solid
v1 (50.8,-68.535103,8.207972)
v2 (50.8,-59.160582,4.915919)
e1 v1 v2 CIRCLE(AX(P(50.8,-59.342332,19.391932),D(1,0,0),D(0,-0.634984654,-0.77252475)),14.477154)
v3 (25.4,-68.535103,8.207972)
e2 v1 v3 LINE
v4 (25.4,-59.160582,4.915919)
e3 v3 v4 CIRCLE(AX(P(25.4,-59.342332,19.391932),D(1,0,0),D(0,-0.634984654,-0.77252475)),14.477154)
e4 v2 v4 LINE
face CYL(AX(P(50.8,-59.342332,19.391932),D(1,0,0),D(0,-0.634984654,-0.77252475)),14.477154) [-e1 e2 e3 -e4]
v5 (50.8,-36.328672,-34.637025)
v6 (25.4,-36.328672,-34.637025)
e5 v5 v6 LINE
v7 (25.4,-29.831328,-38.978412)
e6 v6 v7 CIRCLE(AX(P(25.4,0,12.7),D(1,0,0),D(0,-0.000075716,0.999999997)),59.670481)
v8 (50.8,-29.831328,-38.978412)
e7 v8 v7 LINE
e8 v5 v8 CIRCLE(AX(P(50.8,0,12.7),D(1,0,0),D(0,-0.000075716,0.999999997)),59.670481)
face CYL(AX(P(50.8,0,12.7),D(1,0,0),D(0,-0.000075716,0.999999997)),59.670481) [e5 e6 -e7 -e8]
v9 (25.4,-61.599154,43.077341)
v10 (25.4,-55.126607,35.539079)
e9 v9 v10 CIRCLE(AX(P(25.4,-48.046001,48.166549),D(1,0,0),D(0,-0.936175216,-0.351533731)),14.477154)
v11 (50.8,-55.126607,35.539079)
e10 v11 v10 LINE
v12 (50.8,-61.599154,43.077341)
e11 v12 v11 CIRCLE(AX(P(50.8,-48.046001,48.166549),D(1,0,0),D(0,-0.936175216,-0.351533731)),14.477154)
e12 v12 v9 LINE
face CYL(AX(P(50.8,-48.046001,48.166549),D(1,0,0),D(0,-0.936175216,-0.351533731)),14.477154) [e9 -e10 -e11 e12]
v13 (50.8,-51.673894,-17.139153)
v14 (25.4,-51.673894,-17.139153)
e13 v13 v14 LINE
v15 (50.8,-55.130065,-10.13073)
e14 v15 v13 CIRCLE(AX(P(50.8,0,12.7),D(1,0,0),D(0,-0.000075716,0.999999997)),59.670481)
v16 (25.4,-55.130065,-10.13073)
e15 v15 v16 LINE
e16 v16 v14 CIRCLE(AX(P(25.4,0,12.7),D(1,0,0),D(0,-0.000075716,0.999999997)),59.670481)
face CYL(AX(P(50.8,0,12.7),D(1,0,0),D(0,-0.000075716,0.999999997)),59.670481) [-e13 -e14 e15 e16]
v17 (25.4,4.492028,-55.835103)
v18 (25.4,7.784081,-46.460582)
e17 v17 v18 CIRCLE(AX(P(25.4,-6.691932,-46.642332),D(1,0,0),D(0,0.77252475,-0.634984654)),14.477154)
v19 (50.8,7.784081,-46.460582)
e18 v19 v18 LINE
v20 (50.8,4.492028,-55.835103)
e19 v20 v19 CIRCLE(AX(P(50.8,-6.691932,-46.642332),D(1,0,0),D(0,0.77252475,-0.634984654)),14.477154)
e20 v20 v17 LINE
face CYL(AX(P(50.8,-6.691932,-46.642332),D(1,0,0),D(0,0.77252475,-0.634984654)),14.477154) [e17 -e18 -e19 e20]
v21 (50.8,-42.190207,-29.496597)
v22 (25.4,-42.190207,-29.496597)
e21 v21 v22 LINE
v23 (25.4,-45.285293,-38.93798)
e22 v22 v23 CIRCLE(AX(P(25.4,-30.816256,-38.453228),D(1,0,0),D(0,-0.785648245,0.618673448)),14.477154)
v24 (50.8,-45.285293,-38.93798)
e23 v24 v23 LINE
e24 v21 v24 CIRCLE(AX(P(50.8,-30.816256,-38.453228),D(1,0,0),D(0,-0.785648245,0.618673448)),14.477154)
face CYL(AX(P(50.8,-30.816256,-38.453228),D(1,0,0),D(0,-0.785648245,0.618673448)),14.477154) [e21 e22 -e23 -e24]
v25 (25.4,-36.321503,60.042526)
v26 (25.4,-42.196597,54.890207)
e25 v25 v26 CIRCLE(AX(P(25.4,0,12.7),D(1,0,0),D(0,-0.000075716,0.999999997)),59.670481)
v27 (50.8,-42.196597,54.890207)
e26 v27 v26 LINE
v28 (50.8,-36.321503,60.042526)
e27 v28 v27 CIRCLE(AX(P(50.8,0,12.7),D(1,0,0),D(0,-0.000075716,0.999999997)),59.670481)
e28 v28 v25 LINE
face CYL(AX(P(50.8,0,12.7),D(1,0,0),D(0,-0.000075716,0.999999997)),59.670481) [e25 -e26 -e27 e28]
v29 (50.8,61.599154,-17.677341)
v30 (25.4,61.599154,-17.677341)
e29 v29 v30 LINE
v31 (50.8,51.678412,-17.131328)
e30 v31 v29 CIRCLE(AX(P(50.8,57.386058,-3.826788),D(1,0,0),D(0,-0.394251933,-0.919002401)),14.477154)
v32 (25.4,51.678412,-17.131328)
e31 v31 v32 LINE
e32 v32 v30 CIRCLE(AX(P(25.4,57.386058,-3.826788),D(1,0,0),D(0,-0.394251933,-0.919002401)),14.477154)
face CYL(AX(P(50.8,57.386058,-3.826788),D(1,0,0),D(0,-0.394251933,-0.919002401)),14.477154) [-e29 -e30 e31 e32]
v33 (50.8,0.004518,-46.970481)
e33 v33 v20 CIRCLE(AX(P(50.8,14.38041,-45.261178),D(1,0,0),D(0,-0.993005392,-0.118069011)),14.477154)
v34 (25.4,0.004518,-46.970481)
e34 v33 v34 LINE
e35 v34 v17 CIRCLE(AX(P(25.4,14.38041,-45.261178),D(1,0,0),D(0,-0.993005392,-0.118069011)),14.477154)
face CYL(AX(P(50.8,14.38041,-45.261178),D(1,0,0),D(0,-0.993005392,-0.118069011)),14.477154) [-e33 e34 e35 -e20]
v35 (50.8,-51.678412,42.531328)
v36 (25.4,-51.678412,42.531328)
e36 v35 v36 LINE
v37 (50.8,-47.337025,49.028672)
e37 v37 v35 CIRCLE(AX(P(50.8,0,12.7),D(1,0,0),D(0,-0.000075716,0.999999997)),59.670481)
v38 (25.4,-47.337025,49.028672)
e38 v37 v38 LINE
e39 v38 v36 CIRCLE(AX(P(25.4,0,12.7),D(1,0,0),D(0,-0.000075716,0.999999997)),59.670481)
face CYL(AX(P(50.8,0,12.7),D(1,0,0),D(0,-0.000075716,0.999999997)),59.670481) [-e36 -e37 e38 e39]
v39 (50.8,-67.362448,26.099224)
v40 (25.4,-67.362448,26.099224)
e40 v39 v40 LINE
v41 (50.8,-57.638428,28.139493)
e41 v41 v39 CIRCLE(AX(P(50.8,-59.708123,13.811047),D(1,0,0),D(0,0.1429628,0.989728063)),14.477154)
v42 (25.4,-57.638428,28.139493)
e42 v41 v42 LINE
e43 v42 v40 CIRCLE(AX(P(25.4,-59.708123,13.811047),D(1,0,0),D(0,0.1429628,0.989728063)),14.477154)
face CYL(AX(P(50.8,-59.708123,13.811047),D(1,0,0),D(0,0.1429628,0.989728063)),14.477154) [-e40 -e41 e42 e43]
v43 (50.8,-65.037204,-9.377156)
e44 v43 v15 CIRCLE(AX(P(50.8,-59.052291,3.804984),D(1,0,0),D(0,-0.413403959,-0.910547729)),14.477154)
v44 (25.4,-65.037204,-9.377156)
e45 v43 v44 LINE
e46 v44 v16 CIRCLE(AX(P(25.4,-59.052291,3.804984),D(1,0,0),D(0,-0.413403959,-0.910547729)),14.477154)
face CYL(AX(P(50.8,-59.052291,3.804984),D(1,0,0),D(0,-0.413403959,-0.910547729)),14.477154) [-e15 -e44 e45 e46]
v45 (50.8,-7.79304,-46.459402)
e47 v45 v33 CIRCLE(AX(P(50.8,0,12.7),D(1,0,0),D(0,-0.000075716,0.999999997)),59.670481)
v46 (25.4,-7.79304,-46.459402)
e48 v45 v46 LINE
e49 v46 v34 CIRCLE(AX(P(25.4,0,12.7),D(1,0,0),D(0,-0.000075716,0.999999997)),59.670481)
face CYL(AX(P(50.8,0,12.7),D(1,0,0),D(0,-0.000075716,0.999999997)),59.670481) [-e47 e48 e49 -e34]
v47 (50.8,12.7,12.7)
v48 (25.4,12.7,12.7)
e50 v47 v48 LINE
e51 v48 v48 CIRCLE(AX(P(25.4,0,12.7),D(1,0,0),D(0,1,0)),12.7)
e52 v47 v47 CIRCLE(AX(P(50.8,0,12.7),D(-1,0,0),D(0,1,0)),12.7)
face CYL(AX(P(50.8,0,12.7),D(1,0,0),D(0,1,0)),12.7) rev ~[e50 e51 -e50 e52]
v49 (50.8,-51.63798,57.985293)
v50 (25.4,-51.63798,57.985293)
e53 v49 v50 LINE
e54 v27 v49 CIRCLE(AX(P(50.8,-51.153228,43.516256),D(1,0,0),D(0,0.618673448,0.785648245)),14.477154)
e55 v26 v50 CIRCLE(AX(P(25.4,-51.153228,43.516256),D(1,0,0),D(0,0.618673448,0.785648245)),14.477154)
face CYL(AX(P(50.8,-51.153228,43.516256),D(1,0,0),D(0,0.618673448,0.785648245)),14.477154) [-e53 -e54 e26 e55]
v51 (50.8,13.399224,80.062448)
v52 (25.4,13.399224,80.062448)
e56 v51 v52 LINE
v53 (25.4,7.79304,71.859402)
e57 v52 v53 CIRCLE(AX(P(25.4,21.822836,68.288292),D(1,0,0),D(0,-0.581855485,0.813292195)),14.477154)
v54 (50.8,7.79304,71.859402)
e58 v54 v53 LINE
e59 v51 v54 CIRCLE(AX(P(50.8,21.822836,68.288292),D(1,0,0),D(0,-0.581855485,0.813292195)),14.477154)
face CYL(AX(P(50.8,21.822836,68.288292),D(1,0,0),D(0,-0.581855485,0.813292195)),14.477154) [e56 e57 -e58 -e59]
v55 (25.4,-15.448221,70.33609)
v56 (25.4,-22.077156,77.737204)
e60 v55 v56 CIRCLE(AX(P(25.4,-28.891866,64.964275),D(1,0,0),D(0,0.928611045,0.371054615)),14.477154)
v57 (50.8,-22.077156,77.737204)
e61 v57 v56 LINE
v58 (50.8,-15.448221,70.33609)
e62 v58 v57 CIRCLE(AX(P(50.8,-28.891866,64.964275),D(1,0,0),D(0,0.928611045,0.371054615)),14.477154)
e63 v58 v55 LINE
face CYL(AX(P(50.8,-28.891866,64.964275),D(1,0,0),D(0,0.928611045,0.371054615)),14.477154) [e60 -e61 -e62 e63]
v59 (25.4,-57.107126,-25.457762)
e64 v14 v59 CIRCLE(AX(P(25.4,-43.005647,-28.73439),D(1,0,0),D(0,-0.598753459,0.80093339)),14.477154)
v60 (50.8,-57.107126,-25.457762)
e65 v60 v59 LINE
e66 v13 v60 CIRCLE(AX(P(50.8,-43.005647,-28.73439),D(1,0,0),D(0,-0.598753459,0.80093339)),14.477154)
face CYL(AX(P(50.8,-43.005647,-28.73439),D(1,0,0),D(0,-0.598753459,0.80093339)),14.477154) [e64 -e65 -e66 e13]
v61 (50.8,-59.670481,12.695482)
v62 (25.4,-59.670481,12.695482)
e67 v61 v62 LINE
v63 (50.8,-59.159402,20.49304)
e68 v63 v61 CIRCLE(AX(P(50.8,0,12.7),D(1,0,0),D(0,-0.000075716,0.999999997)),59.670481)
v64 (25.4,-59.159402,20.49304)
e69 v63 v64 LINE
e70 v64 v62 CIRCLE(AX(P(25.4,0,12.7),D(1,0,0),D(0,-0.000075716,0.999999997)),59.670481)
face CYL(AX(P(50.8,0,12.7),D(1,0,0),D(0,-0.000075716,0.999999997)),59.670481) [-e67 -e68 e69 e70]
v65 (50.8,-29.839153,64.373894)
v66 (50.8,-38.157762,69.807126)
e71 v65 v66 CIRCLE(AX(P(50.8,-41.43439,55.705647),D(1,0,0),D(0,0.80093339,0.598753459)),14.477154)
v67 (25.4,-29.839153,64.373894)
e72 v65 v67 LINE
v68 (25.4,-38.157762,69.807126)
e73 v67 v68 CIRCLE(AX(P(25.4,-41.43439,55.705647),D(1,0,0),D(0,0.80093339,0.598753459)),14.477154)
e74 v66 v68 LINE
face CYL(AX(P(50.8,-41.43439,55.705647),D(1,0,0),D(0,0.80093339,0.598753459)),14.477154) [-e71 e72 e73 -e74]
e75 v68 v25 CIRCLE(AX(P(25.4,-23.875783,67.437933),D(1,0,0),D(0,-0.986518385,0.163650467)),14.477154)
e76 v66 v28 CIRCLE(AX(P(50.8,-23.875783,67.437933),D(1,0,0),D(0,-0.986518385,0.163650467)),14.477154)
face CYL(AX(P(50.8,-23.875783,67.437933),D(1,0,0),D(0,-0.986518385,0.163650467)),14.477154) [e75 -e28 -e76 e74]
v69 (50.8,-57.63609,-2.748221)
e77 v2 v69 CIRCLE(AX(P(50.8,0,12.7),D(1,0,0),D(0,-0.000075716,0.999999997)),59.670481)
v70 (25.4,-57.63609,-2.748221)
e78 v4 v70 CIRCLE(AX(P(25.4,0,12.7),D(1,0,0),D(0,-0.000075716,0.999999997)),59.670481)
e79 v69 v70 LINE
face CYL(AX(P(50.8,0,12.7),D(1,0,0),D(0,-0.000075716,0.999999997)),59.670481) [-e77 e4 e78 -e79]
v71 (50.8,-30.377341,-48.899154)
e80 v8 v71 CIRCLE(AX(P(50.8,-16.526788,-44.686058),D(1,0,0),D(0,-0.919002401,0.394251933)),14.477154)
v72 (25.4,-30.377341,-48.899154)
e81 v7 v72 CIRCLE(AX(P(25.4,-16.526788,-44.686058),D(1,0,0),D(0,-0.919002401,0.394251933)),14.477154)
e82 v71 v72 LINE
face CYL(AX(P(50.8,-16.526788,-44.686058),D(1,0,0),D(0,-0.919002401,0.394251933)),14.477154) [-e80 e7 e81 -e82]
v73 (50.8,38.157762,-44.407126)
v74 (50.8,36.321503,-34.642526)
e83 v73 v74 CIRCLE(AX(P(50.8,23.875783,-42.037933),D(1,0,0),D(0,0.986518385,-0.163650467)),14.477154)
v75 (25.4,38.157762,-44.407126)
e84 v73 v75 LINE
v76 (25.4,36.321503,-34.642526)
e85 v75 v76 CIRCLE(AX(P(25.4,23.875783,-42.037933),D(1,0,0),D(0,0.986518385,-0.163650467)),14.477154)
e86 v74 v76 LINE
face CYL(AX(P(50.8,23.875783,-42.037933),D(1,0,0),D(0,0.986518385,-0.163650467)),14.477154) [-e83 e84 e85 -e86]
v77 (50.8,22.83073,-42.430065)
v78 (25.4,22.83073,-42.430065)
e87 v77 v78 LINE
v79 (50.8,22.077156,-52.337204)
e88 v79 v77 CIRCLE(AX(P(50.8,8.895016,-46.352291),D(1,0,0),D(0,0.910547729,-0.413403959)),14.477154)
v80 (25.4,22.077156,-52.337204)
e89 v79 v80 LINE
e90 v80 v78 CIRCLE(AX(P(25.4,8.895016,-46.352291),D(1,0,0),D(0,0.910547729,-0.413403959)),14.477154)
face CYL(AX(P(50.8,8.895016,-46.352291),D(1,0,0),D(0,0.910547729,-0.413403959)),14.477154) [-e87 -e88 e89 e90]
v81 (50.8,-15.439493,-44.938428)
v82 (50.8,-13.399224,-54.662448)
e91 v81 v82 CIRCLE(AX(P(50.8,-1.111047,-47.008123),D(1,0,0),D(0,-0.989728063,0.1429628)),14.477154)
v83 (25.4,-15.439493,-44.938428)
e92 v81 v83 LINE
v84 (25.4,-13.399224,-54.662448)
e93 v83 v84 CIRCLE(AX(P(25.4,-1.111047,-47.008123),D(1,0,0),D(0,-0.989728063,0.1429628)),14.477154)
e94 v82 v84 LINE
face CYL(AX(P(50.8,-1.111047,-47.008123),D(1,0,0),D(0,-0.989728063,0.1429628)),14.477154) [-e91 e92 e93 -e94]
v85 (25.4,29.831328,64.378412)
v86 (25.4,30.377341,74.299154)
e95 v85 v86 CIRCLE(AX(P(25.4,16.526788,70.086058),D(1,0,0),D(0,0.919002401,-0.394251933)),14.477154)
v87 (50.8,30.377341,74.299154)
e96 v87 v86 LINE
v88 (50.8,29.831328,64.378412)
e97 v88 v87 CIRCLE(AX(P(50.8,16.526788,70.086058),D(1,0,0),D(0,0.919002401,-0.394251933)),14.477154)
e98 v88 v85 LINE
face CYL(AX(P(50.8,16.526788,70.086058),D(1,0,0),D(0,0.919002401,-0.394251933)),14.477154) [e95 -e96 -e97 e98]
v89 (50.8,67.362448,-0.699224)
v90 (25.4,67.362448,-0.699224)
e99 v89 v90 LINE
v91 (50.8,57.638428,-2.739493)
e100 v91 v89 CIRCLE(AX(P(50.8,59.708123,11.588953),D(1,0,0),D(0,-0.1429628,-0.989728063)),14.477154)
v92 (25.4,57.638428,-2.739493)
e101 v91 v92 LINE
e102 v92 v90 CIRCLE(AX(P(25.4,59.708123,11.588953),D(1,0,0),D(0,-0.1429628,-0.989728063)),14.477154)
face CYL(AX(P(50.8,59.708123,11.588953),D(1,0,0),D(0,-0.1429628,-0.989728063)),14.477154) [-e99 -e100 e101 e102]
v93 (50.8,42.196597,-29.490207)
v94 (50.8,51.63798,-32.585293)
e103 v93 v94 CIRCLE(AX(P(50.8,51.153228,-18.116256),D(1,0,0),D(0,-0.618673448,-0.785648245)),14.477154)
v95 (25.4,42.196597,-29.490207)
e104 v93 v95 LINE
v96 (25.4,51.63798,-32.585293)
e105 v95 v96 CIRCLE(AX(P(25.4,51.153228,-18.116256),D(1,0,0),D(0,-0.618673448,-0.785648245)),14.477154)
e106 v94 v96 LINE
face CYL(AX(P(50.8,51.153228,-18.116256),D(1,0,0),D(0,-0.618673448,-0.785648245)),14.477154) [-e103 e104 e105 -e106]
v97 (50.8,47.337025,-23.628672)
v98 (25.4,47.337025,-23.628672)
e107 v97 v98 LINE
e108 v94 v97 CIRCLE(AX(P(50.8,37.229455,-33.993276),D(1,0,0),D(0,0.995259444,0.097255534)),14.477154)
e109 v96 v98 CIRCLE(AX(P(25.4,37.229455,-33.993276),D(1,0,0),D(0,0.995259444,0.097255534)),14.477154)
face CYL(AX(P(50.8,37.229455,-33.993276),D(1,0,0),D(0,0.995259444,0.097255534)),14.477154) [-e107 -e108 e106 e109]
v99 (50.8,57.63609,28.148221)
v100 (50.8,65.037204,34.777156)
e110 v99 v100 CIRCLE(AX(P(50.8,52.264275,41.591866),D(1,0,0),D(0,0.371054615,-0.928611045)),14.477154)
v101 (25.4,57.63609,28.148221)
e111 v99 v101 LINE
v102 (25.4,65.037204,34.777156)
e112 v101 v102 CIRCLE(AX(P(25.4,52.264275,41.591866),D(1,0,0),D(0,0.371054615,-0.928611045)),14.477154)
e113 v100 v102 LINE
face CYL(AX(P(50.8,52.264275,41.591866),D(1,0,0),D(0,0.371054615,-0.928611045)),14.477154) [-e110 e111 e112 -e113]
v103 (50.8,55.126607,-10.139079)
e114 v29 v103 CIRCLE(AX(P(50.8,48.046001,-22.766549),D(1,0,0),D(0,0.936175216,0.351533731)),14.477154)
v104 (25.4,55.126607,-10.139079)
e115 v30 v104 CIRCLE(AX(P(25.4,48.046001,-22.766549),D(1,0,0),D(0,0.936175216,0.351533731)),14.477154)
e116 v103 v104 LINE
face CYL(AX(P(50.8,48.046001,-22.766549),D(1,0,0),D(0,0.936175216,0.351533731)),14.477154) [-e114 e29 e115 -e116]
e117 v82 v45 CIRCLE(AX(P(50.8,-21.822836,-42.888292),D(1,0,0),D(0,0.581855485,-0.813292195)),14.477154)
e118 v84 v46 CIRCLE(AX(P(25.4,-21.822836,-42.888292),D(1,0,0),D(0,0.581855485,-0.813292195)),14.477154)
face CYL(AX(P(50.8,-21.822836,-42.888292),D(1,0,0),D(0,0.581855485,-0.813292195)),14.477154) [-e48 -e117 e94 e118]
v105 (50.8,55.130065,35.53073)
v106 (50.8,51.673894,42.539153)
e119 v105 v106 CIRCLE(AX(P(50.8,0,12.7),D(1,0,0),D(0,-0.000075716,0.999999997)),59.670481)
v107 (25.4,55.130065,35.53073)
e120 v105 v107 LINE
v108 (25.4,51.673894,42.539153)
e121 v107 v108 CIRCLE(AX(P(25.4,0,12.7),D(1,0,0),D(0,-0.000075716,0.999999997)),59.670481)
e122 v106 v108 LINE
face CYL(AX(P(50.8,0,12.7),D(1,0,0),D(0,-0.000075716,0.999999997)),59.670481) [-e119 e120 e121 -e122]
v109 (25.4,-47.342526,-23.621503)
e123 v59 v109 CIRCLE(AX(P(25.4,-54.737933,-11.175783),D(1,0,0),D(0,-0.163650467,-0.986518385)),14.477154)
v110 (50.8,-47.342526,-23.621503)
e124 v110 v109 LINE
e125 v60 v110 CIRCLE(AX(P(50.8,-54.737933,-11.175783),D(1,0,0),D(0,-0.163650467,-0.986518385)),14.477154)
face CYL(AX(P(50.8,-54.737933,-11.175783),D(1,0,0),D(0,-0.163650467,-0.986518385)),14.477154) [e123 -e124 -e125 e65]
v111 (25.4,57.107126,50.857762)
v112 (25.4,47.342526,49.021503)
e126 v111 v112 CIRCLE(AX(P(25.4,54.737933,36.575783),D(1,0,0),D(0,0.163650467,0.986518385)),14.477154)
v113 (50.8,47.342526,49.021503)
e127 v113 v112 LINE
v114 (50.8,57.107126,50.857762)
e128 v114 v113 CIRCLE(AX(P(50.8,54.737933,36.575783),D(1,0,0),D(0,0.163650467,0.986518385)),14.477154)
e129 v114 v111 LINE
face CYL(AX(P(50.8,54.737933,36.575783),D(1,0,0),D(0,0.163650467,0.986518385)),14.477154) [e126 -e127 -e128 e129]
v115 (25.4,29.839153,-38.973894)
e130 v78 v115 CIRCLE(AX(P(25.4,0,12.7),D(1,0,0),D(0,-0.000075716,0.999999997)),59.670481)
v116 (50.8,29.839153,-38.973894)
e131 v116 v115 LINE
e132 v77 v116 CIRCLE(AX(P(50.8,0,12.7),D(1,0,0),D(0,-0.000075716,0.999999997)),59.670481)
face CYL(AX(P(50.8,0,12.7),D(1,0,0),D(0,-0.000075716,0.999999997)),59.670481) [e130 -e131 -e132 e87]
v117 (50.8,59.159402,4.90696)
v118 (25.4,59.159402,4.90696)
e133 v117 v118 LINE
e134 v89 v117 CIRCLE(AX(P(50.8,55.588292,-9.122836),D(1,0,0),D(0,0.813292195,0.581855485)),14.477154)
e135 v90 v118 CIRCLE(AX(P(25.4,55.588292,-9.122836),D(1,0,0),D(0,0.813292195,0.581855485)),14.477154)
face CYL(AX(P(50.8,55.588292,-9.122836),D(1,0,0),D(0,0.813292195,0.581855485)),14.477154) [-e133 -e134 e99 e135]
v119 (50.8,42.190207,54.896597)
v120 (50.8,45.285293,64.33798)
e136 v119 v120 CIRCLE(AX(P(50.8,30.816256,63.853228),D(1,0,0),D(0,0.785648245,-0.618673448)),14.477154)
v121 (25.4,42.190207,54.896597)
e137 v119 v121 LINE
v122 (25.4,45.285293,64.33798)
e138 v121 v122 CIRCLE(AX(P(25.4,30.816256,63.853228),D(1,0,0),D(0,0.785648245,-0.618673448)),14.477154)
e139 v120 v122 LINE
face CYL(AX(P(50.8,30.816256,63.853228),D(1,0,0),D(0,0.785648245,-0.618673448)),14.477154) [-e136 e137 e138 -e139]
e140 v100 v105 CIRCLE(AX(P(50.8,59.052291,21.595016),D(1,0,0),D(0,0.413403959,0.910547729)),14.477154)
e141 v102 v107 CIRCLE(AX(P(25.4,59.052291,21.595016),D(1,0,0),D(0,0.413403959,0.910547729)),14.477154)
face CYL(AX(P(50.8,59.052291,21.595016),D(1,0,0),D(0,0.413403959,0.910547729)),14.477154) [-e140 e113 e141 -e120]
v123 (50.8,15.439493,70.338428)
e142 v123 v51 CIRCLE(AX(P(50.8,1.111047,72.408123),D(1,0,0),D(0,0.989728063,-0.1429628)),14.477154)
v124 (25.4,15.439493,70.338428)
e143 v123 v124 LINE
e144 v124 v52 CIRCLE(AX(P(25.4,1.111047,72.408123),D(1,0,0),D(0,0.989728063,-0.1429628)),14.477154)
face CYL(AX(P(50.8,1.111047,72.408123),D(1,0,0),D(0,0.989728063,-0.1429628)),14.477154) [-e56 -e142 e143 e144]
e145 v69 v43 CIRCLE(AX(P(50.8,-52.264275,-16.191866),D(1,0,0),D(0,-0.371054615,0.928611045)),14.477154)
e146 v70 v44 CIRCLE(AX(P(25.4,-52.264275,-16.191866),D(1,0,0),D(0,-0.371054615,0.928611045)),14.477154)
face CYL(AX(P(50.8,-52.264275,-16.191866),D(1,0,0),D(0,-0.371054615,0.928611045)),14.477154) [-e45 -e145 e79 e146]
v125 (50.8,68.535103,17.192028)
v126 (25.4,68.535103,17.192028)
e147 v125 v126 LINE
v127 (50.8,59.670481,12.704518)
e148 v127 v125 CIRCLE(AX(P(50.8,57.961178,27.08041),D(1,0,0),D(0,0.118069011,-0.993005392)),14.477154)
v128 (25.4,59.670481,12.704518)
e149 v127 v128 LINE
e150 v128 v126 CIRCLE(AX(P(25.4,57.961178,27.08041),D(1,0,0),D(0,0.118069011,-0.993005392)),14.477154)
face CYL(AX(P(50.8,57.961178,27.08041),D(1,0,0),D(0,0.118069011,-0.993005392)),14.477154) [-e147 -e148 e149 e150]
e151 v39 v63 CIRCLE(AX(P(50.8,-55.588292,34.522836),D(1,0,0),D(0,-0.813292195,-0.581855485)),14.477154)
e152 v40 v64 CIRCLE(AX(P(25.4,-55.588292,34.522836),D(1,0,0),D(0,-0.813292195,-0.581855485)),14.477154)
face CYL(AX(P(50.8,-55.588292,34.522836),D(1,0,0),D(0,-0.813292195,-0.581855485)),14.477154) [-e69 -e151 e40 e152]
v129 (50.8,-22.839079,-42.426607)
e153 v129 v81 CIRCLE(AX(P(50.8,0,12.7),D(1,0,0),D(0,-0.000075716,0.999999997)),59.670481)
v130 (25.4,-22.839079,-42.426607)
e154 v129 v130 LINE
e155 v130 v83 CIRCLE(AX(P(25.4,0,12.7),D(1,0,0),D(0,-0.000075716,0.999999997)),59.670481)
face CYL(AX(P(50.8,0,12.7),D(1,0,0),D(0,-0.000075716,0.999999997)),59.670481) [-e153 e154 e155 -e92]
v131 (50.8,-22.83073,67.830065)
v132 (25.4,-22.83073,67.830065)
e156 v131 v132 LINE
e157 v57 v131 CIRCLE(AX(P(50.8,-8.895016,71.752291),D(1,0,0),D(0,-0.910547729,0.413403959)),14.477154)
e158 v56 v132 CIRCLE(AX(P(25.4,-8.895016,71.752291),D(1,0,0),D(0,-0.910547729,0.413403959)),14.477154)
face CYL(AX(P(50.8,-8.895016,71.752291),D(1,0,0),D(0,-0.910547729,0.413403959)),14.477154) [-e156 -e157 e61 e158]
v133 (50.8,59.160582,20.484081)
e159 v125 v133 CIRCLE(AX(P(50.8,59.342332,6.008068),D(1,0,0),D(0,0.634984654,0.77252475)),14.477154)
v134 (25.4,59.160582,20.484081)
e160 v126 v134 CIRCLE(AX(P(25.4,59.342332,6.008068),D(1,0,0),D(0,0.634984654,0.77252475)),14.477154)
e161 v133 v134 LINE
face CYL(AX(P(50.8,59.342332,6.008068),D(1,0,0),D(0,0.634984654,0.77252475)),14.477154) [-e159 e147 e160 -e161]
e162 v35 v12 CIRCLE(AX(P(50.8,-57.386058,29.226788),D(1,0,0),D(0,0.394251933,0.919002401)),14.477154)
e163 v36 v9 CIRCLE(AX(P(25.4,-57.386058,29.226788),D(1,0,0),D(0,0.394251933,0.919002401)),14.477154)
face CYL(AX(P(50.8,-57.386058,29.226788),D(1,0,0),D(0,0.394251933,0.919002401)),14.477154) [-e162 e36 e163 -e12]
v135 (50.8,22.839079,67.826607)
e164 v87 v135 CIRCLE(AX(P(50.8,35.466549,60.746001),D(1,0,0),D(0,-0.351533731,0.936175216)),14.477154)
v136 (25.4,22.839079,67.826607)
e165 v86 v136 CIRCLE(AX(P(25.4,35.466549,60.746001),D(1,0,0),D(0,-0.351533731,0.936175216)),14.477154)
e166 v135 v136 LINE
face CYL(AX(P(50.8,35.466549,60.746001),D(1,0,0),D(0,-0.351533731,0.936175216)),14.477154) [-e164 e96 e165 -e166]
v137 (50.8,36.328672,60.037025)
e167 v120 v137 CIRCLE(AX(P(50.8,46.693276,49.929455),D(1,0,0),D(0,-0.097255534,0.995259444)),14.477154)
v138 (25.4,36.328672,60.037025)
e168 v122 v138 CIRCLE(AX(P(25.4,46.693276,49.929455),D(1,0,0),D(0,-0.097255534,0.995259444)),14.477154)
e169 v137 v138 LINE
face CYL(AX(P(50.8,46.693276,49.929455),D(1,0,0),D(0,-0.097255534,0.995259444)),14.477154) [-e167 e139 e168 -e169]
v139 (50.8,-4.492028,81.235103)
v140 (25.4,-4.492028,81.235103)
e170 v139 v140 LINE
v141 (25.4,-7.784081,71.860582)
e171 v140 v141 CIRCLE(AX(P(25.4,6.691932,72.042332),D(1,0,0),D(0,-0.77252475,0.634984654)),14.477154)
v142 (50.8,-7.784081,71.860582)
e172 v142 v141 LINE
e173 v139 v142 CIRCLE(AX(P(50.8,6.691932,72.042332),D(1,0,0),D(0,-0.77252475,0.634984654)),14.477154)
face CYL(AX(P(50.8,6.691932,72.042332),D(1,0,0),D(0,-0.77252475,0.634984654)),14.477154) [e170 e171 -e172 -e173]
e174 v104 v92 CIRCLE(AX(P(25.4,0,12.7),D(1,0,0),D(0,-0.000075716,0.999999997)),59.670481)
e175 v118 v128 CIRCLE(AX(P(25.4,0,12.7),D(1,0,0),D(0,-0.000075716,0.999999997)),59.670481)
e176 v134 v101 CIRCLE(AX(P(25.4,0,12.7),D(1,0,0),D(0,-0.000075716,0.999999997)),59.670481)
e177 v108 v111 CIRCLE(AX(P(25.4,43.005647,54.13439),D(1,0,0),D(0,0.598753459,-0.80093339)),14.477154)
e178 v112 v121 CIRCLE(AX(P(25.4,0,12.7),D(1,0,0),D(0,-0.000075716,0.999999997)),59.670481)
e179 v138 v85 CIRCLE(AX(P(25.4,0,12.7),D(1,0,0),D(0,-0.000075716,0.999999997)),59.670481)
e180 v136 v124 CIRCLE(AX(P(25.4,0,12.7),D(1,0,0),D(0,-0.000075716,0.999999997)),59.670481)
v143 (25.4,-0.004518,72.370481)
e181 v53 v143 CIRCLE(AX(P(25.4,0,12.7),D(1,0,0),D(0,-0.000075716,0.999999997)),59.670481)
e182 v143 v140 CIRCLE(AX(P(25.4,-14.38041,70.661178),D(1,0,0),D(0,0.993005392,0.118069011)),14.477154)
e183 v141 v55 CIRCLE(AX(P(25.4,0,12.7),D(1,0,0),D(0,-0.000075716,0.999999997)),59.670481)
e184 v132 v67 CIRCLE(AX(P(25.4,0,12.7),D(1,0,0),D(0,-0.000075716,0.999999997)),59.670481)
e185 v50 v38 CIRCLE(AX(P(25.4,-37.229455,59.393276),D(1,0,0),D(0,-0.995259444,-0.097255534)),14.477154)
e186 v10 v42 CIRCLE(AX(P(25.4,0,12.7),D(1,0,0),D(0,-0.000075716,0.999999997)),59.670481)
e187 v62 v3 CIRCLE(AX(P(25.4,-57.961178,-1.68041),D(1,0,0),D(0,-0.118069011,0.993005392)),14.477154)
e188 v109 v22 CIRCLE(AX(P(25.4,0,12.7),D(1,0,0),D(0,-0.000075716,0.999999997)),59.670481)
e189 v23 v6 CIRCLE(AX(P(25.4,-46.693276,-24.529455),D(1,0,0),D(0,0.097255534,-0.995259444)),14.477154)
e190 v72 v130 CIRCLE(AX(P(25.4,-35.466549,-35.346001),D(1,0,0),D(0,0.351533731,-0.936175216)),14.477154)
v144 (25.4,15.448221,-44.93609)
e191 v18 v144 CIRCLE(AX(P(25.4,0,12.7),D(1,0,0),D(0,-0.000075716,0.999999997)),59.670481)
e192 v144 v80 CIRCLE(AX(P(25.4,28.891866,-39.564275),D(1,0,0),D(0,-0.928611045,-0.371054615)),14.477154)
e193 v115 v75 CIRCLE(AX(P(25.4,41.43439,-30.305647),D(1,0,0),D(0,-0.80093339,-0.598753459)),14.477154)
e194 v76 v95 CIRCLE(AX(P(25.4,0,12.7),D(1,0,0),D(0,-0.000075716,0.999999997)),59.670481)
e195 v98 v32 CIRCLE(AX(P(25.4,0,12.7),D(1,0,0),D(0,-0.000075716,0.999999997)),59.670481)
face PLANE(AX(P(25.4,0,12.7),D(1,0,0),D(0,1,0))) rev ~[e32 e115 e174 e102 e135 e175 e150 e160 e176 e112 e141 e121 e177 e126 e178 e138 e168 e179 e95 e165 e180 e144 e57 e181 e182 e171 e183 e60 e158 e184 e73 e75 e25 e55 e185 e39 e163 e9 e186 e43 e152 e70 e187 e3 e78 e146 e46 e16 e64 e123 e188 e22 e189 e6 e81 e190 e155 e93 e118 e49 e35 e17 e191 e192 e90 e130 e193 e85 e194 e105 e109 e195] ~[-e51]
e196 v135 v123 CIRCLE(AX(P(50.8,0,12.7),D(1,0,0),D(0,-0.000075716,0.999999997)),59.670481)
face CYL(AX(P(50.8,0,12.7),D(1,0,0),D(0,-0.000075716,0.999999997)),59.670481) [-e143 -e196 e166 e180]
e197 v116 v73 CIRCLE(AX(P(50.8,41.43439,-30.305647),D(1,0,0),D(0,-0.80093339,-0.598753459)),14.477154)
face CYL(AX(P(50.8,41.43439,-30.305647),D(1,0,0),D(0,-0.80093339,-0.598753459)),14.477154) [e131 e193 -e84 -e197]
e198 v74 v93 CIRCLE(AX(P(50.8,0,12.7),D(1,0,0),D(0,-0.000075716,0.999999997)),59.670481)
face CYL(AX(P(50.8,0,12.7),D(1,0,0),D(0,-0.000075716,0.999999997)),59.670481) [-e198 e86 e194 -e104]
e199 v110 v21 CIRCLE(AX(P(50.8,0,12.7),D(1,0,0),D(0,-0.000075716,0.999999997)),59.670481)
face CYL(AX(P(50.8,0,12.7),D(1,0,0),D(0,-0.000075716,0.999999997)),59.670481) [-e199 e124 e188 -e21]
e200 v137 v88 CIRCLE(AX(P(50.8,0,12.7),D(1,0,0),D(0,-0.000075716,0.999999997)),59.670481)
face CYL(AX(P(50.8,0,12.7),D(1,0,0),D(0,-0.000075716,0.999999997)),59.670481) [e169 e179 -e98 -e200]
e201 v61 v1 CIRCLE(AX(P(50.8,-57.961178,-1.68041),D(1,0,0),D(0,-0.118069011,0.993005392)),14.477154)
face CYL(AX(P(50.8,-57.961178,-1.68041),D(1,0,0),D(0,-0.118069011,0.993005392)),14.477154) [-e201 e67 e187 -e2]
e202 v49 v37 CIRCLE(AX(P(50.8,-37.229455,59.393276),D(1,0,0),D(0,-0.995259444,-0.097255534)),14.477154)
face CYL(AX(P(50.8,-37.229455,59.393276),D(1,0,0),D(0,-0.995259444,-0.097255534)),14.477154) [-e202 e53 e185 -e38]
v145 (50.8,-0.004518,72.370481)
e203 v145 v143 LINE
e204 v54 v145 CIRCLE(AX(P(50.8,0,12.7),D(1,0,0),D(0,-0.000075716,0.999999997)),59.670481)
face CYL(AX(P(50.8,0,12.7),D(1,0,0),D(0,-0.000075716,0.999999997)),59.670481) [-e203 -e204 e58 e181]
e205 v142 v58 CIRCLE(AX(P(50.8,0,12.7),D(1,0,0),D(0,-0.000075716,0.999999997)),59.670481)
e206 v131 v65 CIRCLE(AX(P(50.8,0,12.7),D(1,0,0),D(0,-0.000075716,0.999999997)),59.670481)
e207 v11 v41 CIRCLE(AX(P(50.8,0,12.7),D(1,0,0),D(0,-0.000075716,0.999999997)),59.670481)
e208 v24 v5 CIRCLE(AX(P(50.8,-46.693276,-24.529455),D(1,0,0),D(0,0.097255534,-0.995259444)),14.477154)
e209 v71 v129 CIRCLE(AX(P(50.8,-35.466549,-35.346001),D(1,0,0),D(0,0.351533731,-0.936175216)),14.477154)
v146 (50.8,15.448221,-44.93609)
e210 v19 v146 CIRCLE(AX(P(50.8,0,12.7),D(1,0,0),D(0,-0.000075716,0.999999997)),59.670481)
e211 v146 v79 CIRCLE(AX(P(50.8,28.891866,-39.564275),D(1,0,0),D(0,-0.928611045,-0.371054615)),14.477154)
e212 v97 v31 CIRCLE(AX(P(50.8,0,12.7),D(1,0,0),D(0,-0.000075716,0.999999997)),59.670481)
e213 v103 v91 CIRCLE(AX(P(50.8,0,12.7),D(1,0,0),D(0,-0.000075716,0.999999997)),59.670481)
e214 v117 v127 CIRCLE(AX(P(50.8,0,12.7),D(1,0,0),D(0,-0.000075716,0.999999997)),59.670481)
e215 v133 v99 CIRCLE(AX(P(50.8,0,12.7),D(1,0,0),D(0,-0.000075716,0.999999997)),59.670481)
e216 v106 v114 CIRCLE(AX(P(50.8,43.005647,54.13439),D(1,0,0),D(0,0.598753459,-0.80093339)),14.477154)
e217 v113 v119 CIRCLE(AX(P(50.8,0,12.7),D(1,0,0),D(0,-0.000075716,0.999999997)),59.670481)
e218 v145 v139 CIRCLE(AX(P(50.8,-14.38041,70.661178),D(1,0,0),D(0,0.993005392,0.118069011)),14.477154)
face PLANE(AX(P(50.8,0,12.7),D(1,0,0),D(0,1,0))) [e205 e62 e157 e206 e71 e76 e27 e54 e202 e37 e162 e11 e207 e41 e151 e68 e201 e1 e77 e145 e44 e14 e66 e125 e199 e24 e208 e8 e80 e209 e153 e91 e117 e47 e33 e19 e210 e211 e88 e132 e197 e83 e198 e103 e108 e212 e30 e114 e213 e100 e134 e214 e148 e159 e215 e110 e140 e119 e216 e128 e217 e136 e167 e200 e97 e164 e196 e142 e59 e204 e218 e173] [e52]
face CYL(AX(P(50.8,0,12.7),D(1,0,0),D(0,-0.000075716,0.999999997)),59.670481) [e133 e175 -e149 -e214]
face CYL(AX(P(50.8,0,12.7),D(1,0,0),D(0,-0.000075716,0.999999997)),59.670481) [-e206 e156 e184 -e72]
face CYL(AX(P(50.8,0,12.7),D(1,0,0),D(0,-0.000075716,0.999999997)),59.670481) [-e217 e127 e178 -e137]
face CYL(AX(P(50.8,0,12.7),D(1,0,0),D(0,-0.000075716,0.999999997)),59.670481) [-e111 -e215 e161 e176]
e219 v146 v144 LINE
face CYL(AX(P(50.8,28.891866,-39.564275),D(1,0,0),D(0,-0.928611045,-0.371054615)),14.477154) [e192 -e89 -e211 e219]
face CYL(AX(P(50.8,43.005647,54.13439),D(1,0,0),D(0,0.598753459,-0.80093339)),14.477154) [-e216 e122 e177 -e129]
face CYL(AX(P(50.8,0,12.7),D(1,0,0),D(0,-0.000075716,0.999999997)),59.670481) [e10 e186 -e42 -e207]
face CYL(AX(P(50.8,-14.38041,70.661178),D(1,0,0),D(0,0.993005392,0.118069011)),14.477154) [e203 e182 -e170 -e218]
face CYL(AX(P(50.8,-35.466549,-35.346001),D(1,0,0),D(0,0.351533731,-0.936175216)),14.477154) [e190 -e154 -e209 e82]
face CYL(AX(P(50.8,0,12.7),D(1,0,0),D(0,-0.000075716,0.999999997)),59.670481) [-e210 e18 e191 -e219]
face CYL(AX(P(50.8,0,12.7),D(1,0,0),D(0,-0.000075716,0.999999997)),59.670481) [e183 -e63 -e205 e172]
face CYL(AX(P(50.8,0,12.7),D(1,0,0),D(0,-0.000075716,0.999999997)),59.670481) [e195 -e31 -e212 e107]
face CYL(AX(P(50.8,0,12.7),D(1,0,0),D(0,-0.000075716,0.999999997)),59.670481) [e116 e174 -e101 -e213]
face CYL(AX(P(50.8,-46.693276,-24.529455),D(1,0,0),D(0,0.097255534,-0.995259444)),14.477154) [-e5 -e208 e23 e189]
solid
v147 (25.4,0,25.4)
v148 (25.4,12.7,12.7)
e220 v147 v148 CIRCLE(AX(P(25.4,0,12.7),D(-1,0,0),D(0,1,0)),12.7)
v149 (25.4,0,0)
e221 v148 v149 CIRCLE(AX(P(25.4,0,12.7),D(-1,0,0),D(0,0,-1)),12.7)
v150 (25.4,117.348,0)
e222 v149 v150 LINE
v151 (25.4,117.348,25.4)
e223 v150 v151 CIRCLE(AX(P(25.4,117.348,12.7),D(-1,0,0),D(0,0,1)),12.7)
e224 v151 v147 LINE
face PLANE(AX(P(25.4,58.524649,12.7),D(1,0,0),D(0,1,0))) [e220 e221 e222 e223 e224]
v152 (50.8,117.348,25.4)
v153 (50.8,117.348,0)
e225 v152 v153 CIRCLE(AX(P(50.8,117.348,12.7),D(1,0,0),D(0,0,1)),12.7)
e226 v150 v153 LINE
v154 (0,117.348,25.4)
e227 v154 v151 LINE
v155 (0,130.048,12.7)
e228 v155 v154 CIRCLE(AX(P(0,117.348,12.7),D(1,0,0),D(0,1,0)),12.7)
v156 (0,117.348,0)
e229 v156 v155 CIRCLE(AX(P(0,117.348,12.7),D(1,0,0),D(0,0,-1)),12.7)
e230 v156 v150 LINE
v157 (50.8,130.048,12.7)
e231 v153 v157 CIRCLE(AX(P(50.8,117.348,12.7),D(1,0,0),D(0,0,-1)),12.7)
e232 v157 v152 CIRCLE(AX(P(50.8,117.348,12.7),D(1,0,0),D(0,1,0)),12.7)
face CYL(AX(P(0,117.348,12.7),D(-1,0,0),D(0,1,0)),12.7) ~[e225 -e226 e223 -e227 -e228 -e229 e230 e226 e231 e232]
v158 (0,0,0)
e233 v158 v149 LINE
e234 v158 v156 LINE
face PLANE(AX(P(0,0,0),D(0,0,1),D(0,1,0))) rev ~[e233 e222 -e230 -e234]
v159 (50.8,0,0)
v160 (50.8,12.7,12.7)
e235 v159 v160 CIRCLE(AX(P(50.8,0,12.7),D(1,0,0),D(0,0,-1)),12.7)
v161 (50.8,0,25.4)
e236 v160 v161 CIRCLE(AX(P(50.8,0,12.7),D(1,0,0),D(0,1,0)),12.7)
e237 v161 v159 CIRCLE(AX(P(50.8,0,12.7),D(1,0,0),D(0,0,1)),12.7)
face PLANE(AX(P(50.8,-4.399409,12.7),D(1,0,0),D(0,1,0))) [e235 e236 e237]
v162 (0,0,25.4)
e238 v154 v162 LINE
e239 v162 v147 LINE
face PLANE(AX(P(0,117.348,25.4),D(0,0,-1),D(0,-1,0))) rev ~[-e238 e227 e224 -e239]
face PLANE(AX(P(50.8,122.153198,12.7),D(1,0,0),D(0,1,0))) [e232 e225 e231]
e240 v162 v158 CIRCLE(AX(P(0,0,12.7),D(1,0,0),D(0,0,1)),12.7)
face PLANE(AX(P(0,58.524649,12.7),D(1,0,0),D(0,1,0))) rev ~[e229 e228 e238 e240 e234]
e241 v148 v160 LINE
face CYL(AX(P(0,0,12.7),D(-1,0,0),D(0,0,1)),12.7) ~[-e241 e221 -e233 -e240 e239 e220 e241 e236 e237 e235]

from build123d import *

# Parameters (mm, degrees)
F1_DEPTH = 25.4
F2_DEPTH = 50.8
F3_R     = 12.7
F4_DEPTH = 25.4
F5_COUNT = 24
F5_ANGLE = 345


with BuildPart() as f1:
    # F0 (on Right) → F1 (new body)
    with BuildSketch(Plane.YZ):
        with BuildLine():
            ThreePointArc((12.7, 12.7), (8.9802561211, 3.7197438789), (0, 0))
            Line((0, 0), (117.348, 0))
            ThreePointArc((117.348, 0), (104.648, 12.7), (117.348, 25.4))
            Line((117.348, 25.4), (0, 25.4))
            ThreePointArc((0, 25.4), (8.9802561211, 21.6802561211), (12.7, 12.7))
        make_face()
        with BuildLine():
            ThreePointArc((0, 25.4), (-12.7, 12.7), (0, 0))
            Line((0, 0), (0, 25.4))
        make_face()
        with BuildLine():
            Line((0, 25.4), (0, 0))
            ThreePointArc((0, 0), (8.9802561211, 3.7197438789), (12.7, 12.7))
            ThreePointArc((12.7, 12.7), (8.9802561211, 21.6802561211), (0, 25.4))
        make_face()
        with BuildLine():
            ThreePointArc((117.348, 25.4), (104.648, 12.7), (117.348, 0))
            Line((117.348, 0), (117.348, 25.4))
        make_face()
        with BuildLine():
            Line((117.348, 25.4), (117.348, 0))
            ThreePointArc((117.348, 0), (126.3282561211, 3.7197438789), (130.048, 12.7))
            ThreePointArc((130.048, 12.7), (126.3282561211, 21.6802561211), (117.348, 25.4))
        make_face()
    extrude(amount=F1_DEPTH)

    # F0 (on Right) → F2 (join)
    with BuildSketch(Plane.YZ):
        with BuildLine():
            ThreePointArc((0, 25.4), (-12.7, 12.7), (0, 0))
            Line((0, 0), (0, 25.4))
        make_face()
        with BuildLine():
            Line((0, 25.4), (0, 0))
            ThreePointArc((0, 0), (8.9802561211, 3.7197438789), (12.7, 12.7))
            ThreePointArc((12.7, 12.7), (8.9802561211, 21.6802561211), (0, 25.4))
        make_face()
        with BuildLine():
            Line((117.348, 25.4), (117.348, 0))
            ThreePointArc((117.348, 0), (126.3282561211, 3.7197438789), (130.048, 12.7))
            ThreePointArc((130.048, 12.7), (126.3282561211, 21.6802561211), (117.348, 25.4))
        make_face()
        with BuildLine():
            ThreePointArc((117.348, 25.4), (104.648, 12.7), (117.348, 0))
            Line((117.348, 0), (117.348, 25.4))
        make_face()
    extrude(amount=F2_DEPTH)


with BuildPart() as f4:
    # F3 (on face) → F4 (new body)
    with BuildSketch(Plane.YZ.offset(50.8)):
        with BuildLine():
            ThreePointArc((-7.7840813249, 71.8605817315), (-39.3451805995, -32.1611537578), (59.6704814199, 12.7))
            ThreePointArc((59.6704814199, 12.7), (42.1918046526, 54.8949993843), (-0.0045180328, 72.3704812489))
            ThreePointArc((-0.0045180328, 72.3704812489), (-3.9026362075, 72.2427223388), (-7.7840813249, 71.8605817315))
        make_face()
        with Locations((0, 12.7)):
            Circle(F3_R, mode=Mode.SUBTRACT)
        with BuildLine():
            ThreePointArc((-7.7840813249, 71.8605817315), (-3.9026362075, 72.2427223388), (-0.0045180328, 72.3704812489))
            ThreePointArc((-0.0045180328, 72.3704812489), (-1.463981414, 77.1998216133), (-4.492027974, 81.2351029848))
            ThreePointArc((-4.492027974, 81.2351029848), (-6.967459264, 76.8391046175), (-7.7840813249, 71.8605817315))
        make_face()
    extrude(amount=-F4_DEPTH)

    # F5: F4 ×24 about axis
    f5_axis = Axis((50.8, 0, 12.7), (1, 0, 0))


with BuildPart() as f4_1:
    add(f4.part)
    for i in range(1, F5_COUNT):
        add(f4.part.rotate(f5_axis, i * F5_ANGLE / (F5_COUNT - 1)))


solid = Compound([f1.part, f4_1.part])
